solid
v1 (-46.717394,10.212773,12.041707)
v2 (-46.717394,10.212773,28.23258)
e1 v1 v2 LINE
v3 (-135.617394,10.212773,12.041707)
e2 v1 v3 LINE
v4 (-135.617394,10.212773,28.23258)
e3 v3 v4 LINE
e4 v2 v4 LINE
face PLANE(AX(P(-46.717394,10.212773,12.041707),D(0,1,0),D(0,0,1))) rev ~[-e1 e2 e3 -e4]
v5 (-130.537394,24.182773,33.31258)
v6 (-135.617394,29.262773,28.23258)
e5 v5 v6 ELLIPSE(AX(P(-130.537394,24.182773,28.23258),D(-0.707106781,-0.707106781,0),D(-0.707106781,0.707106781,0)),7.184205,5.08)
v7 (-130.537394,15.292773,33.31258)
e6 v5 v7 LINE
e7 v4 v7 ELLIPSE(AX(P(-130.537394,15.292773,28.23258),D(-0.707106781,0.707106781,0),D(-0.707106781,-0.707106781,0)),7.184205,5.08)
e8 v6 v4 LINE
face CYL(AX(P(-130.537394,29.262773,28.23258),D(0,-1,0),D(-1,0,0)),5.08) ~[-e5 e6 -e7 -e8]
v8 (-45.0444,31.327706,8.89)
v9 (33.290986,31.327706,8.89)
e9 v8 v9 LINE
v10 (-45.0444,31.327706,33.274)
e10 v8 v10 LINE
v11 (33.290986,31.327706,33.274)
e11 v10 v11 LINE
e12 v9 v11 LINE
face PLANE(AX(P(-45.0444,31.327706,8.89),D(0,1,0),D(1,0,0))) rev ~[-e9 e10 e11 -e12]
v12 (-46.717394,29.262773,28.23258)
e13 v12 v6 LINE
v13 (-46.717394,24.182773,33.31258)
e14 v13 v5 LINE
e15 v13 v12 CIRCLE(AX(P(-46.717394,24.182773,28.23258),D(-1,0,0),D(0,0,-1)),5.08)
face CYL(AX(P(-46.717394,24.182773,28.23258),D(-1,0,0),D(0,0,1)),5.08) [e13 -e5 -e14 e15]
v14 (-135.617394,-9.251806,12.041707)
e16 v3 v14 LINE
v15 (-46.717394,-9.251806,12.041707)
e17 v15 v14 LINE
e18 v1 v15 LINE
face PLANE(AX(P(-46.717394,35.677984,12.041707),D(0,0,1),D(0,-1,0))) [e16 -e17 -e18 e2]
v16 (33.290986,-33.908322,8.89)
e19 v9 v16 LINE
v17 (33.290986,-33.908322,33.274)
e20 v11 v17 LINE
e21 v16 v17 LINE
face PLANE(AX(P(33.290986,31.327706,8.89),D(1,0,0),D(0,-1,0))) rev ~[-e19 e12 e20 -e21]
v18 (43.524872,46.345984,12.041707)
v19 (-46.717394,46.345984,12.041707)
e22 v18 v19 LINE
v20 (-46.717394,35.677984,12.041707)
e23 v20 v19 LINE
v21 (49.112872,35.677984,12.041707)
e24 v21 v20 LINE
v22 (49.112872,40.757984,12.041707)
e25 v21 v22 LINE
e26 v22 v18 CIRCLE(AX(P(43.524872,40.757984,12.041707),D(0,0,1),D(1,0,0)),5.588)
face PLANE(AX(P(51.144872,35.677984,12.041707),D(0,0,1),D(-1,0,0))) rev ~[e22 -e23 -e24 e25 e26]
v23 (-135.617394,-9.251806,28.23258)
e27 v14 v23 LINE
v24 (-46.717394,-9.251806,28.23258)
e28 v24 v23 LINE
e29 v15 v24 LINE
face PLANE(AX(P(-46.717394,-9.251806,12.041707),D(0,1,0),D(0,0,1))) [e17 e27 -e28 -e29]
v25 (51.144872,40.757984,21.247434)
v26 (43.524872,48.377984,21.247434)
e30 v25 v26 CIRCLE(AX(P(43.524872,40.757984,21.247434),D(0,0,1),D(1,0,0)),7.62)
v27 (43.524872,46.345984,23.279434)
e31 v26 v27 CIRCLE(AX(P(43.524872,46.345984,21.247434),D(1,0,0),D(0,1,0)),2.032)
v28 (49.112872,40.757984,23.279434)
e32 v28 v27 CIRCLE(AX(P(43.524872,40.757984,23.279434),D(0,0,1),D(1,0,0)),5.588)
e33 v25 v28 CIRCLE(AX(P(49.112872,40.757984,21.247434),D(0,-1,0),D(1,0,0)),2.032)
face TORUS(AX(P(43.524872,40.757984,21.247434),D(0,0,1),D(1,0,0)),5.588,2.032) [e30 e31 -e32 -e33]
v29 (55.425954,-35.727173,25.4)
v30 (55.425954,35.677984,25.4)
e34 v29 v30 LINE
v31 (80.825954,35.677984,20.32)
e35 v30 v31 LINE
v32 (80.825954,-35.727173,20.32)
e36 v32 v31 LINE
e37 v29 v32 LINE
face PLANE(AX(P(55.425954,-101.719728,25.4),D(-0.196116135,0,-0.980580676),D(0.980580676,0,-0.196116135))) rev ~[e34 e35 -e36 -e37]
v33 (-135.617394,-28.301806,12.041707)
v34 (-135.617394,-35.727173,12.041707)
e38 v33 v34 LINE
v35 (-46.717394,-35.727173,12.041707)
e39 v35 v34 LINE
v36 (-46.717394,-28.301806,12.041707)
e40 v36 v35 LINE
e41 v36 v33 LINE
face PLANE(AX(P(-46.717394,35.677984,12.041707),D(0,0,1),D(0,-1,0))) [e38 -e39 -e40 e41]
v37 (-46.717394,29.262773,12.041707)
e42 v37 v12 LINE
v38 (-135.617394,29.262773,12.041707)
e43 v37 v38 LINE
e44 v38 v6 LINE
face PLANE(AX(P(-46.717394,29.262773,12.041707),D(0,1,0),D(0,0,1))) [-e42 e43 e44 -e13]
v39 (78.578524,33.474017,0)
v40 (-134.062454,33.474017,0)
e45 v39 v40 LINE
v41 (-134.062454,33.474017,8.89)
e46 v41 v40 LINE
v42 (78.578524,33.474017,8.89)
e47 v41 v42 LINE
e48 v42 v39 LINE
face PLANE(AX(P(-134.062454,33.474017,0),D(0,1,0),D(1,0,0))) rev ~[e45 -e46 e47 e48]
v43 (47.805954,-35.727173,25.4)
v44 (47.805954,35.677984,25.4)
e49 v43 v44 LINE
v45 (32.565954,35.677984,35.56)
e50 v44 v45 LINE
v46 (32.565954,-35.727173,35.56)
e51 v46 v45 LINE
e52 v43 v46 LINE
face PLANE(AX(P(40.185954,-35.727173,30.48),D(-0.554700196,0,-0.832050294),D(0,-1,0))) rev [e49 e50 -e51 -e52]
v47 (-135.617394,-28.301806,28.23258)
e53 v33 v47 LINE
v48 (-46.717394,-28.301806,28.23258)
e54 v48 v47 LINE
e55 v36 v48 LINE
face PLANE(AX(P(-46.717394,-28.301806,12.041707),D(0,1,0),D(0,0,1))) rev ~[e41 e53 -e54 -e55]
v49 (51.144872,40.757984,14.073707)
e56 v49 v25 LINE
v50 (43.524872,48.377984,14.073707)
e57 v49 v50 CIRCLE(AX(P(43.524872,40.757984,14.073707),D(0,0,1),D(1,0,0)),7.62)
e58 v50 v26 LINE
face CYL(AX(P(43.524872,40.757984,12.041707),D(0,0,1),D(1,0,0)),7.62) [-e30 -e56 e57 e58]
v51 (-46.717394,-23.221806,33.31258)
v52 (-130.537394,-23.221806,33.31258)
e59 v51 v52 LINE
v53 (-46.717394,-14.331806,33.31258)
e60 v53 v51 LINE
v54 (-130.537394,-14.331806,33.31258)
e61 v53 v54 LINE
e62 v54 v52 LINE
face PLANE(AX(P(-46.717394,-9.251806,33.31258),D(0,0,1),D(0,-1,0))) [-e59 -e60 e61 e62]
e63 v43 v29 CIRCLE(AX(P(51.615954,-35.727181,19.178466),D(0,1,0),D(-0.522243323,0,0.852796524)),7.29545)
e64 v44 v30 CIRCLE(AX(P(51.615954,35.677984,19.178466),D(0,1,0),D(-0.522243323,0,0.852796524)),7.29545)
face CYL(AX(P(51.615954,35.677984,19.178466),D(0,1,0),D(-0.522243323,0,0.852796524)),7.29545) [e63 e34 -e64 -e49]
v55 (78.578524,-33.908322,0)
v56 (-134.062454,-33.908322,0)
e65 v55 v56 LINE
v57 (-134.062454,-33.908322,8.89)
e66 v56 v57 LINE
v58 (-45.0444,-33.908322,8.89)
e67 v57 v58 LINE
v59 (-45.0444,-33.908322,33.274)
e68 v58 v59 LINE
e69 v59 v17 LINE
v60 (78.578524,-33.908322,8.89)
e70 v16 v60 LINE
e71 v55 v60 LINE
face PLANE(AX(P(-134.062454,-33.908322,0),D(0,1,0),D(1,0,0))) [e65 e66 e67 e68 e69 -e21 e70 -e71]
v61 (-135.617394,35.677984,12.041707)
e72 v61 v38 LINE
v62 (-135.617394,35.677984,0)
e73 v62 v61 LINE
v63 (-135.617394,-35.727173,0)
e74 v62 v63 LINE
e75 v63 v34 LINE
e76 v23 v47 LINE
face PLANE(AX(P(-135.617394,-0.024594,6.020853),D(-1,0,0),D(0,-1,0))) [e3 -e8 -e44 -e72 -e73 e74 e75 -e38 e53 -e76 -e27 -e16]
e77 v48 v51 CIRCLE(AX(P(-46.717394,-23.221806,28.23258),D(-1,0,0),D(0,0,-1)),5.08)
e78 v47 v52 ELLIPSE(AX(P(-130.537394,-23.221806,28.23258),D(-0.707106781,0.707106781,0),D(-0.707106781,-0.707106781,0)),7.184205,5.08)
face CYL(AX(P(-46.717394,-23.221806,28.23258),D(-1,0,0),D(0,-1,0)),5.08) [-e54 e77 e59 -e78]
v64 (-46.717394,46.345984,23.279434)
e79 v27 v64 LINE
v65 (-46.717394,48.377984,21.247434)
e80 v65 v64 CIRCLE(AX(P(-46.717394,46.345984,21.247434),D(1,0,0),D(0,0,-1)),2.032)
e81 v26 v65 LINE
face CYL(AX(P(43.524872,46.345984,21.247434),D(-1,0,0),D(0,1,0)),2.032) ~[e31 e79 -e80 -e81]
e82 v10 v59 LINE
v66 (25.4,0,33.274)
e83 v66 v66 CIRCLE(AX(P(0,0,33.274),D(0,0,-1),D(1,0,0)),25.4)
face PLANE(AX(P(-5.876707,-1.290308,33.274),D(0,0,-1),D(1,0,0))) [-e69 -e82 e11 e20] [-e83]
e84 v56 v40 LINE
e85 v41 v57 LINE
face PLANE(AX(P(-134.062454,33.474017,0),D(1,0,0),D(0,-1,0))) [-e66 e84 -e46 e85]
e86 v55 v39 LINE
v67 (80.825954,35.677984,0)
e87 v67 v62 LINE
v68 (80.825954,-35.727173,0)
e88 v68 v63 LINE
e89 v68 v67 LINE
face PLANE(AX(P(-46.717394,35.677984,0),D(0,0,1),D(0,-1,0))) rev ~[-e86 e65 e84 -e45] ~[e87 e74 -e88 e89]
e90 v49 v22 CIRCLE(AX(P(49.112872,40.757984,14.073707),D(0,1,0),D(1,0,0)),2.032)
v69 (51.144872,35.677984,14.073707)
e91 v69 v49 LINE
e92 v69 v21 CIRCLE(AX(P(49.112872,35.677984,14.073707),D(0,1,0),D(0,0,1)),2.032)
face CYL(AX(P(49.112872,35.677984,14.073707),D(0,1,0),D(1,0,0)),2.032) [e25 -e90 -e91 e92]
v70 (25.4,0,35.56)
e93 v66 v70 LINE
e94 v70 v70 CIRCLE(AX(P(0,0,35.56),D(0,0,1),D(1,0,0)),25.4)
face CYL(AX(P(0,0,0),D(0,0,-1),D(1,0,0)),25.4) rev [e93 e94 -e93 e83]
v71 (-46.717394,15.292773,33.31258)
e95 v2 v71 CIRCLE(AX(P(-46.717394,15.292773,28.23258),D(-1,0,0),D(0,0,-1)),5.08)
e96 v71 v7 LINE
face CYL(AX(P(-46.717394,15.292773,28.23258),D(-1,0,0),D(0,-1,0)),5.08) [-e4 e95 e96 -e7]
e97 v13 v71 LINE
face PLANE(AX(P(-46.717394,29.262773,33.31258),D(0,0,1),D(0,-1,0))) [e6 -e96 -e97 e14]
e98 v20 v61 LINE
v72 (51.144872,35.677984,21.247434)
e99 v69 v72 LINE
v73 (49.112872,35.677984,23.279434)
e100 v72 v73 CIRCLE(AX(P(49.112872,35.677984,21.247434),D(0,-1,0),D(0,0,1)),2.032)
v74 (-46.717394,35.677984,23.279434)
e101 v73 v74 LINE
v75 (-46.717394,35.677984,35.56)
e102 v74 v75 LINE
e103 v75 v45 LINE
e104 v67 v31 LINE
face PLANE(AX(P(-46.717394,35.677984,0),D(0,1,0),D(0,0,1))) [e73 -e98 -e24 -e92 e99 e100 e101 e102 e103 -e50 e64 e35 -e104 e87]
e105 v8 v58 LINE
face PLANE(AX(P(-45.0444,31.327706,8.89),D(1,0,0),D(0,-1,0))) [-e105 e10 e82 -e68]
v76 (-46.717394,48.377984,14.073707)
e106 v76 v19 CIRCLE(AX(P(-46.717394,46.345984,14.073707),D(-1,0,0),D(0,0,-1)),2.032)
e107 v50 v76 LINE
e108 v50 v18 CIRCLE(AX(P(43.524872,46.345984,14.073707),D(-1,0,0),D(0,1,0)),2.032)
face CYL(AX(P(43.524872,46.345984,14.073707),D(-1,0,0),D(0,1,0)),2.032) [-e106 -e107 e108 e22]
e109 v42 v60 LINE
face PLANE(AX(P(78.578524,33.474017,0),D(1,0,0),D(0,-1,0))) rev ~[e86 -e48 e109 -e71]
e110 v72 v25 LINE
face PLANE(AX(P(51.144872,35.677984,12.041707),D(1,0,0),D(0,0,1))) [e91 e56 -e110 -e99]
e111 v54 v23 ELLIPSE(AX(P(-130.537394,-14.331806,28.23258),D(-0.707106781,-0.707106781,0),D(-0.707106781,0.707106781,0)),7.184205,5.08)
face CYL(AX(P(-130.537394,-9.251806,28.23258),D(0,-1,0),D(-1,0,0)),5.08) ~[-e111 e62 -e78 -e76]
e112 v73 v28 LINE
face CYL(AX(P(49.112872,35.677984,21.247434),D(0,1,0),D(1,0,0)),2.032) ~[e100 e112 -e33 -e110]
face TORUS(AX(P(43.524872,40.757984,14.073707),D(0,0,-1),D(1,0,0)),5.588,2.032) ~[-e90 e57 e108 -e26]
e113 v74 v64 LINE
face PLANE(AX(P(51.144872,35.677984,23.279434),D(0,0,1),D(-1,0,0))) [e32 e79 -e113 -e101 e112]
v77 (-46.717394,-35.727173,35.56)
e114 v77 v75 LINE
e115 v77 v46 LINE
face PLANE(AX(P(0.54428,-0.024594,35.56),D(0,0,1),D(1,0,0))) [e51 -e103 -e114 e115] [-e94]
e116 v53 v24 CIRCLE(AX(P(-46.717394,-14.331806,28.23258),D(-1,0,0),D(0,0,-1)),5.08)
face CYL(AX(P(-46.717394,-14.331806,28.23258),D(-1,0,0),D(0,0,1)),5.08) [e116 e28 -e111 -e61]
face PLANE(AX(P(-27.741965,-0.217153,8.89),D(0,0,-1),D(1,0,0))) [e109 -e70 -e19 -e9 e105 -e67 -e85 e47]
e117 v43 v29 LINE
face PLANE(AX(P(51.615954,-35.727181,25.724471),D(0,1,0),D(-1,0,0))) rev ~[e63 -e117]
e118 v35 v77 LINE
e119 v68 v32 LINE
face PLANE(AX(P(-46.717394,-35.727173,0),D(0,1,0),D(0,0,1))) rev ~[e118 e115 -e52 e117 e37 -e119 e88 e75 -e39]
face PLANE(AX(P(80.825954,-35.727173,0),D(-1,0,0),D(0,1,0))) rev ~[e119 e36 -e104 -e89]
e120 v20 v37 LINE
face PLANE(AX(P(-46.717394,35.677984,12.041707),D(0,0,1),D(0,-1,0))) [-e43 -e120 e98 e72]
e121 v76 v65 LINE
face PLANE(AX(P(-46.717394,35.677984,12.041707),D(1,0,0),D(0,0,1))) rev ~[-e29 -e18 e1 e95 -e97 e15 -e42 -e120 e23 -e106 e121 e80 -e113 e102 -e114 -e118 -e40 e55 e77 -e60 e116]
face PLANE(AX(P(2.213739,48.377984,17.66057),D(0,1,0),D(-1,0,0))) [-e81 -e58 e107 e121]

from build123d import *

# Parameters (mm, degrees)
F0_W        = 94.5233479142
F0_H        = 71.4051574469
F1_DEPTH    = 35.56
F2_R        = 25.4
F3_DEPTH    = 35.56
F4_SIZE2    = 15.24
F4_SIZE     = 10.16
F5_DEPTH    = 7.62
F7_DEPTH    = 71.4051658
F8_DEPTH    = 25.4
F9_T4_DEPTH = 203.3902674307
F9_S5_R     = 7.295449901
F9_T6_DEPTH = 104
F10_W       = 71.4051574469
F10_H       = 12.0417065918
F11_DEPTH   = 88.9
F12_W       = 19.05
F12_H       = 21.2708730352
F13_DEPTH   = 88.9
F14_W       = 19.05
F14_H       = 21.2708730352
F15_DEPTH   = 88.9
F16_R       = 5.08
F17_W       = 97.8622660041
F17_H       = 11.2377274781
F18_DEPTH   = 12.7
F19_R       = 7.62
F20_R       = 2.032
F21_W       = 212.6409783959
F21_H       = 67.3823393881
F22_DEPTH   = 8.89
F23_W       = 78.3353857696
F23_H       = 65.2360282838
F24_DEPTH   = 24.384


# Not quite as in the source:
# - a fillet or chamfer that OpenCascade refuses, or shapes differently, is made with other operations: its cross-section is extruded or revolved along the edge and cut away or added


with BuildPart() as f1:
    # F0 (on Top) → F1 (new body)
    with BuildSketch(Plane.XY):
        with Locations((0.5442798138, -0.0245943666)):
            Rectangle(F0_W, F0_H)
    extrude(amount=F1_DEPTH)

    # F2 (on Top) → F3 (cut)
    with BuildSketch(Plane.XY):
        Circle(F2_R)
    extrude(amount=F3_DEPTH, mode=Mode.SUBTRACT)

    # F4
    f4_edges = [f1.edges().sort_by_distance(p)[0] for p in [
        (47.805954, -0.024594, 35.56),
    ]]
    f4_side = f1.faces().sort_by_distance((47.805954, -0.024594, 17.78))[0]
    chamfer(f4_edges, length=F4_SIZE, length2=F4_SIZE2, reference=f4_side)

    # F5 (add): a face of the model
    f5_faces = [f1.faces().sort_by_distance(p)[0] for p in [
        (47.8059537709, -0.0245943666, 12.7),
    ]]
    extrude(f5_faces, amount=F5_DEPTH)

    # F6 (on face) → F7 (join)
    with BuildSketch(Plane(origin=(0, 35.6779843569, 0), x_dir=(-1, 0, 0), z_dir=(0, 1, 0))):
        with BuildLine():
            Line((-55.4259537709, 25.4), (-47.8059537709, 25.4))
            ThreePointArc((-47.8059537709, 25.4), (-51.6159537709, 26.473915584), (-55.4259537709, 25.4))
        make_face()
    extrude(amount=-F7_DEPTH)

    # F8 (add): a face of the model
    f8_faces = [f1.faces().sort_by_distance(p)[0] for p in [
        (55.4259537709, -0.0245943666, 12.7),
    ]]
    extrude(f8_faces, amount=F8_DEPTH)

    # F9: chamfer of 5.08 x 25.4 on 1 edges, made by hand


with BuildPart() as f9_tool2:
    # F9_s3 → F9_t4 (new body)
    with BuildSketch(Plane.XZ.offset(101.7197280819)):
        Polygon((55.4259537709, 25.4), (80.8259537709, 20.32), (80.8259537709, 25.4), align=None)
    extrude(amount=-F9_T4_DEPTH)

    # F9_s5 → F9_t6 (cut, symmetric)
    with BuildSketch(Plane.XZ):
        with Locations((51.6159537709, 19.178465683)):
            Circle(F9_S5_R)
    extrude(amount=F9_T6_DEPTH, both=True, mode=Mode.SUBTRACT)


with BuildPart() as f1_1:
    add(f1.part)

    # F9_t1: cut F9_tool2
    add(f9_tool2.part, mode=Mode.SUBTRACT)

    # F10 (on face) → F11 (join)
    with BuildSketch(Plane(origin=(-46.7173941433, 0, 0), x_dir=(0, -1, 0), z_dir=(-1, 0, 0))):
        with Locations((0.0245943666, 6.0208532959)):
            Rectangle(F10_W, F10_H)
    extrude(amount=F11_DEPTH)

    # F12 (on face) → F13 (join)
    with BuildSketch(Plane(origin=(-46.7173941433, 0, 0), x_dir=(0, -1, 0), z_dir=(-1, 0, 0))):
        with Locations((-19.7377734572, 22.6771431095)):
            Rectangle(F12_W, F12_H)
    extrude(amount=F13_DEPTH)

    # F14 (on face) → F15 (join)
    with BuildSketch(Plane(origin=(-46.7173941433, 0, 0), x_dir=(0, -1, 0), z_dir=(-1, 0, 0))):
        with Locations((18.7768059537, 22.6771431095)):
            Rectangle(F14_W, F14_H)
    extrude(amount=F15_DEPTH)

    # F16
    f16_edges = [f1_1.edges().sort_by_distance(p)[0] for p in [
        (-91.167394, 29.262773, 33.31258),
        (-91.167394, 10.212773, 33.31258),
        (-91.167394, -9.251806, 33.31258),
        (-91.167394, -28.301806, 33.31258),
        (-135.617394, 19.737773, 33.31258),
        (-135.617394, -18.776806, 33.31258),
    ]]
    fillet(f16_edges, radius=F16_R)

    # F17 (on face) → F18 (join)
    with BuildSketch(Plane(origin=(0, 35.6779843569, 0), x_dir=(-1, 0, 0), z_dir=(0, 1, 0))):
        with Locations((-2.2137388587, 17.6605703309)):
            Rectangle(F17_W, F17_H)
    extrude(amount=F18_DEPTH)

    # F19
    f19_edges = [f1_1.edges().sort_by_distance(p)[0] for p in [
        (51.144872, 48.377984, 17.66057),
    ]]
    fillet(f19_edges, radius=F19_R)

    # F20
    f20_edges = [f1_1.edges().sort_by_distance(p)[0] for p in [
        (48.913026, 46.146138, 23.279434),
        (51.144872, 38.217984, 23.279434),
        (-1.596261, 48.377984, 23.279434),
        (51.144872, 38.217984, 12.041707),
        (48.913026, 46.146138, 12.041707),
        (-1.596261, 48.377984, 12.041707),
    ]]
    fillet(f20_edges, radius=F20_R)

    # F21 (on face) → F22 (cut, symmetric)
    with BuildSketch(Plane(origin=(0, 0, 0), x_dir=(1, 0, 0), z_dir=(0, 0, -1))):
        with Locations((-27.7419649065, 0.2171527594)):
            Rectangle(F21_W, F21_H)
    extrude(amount=F22_DEPTH, both=True, mode=Mode.SUBTRACT)

    # F23 (on face) → F24 (cut)
    with BuildSketch(Plane(origin=(0, 0, 8.89), x_dir=(1, 0, 0), z_dir=(0, 0, -1))):
        with Locations((-5.8767069131, 1.2903083116)):
            Rectangle(F23_W, F23_H)
    extrude(amount=-F24_DEPTH, mode=Mode.SUBTRACT)


solid = f1_1.part
